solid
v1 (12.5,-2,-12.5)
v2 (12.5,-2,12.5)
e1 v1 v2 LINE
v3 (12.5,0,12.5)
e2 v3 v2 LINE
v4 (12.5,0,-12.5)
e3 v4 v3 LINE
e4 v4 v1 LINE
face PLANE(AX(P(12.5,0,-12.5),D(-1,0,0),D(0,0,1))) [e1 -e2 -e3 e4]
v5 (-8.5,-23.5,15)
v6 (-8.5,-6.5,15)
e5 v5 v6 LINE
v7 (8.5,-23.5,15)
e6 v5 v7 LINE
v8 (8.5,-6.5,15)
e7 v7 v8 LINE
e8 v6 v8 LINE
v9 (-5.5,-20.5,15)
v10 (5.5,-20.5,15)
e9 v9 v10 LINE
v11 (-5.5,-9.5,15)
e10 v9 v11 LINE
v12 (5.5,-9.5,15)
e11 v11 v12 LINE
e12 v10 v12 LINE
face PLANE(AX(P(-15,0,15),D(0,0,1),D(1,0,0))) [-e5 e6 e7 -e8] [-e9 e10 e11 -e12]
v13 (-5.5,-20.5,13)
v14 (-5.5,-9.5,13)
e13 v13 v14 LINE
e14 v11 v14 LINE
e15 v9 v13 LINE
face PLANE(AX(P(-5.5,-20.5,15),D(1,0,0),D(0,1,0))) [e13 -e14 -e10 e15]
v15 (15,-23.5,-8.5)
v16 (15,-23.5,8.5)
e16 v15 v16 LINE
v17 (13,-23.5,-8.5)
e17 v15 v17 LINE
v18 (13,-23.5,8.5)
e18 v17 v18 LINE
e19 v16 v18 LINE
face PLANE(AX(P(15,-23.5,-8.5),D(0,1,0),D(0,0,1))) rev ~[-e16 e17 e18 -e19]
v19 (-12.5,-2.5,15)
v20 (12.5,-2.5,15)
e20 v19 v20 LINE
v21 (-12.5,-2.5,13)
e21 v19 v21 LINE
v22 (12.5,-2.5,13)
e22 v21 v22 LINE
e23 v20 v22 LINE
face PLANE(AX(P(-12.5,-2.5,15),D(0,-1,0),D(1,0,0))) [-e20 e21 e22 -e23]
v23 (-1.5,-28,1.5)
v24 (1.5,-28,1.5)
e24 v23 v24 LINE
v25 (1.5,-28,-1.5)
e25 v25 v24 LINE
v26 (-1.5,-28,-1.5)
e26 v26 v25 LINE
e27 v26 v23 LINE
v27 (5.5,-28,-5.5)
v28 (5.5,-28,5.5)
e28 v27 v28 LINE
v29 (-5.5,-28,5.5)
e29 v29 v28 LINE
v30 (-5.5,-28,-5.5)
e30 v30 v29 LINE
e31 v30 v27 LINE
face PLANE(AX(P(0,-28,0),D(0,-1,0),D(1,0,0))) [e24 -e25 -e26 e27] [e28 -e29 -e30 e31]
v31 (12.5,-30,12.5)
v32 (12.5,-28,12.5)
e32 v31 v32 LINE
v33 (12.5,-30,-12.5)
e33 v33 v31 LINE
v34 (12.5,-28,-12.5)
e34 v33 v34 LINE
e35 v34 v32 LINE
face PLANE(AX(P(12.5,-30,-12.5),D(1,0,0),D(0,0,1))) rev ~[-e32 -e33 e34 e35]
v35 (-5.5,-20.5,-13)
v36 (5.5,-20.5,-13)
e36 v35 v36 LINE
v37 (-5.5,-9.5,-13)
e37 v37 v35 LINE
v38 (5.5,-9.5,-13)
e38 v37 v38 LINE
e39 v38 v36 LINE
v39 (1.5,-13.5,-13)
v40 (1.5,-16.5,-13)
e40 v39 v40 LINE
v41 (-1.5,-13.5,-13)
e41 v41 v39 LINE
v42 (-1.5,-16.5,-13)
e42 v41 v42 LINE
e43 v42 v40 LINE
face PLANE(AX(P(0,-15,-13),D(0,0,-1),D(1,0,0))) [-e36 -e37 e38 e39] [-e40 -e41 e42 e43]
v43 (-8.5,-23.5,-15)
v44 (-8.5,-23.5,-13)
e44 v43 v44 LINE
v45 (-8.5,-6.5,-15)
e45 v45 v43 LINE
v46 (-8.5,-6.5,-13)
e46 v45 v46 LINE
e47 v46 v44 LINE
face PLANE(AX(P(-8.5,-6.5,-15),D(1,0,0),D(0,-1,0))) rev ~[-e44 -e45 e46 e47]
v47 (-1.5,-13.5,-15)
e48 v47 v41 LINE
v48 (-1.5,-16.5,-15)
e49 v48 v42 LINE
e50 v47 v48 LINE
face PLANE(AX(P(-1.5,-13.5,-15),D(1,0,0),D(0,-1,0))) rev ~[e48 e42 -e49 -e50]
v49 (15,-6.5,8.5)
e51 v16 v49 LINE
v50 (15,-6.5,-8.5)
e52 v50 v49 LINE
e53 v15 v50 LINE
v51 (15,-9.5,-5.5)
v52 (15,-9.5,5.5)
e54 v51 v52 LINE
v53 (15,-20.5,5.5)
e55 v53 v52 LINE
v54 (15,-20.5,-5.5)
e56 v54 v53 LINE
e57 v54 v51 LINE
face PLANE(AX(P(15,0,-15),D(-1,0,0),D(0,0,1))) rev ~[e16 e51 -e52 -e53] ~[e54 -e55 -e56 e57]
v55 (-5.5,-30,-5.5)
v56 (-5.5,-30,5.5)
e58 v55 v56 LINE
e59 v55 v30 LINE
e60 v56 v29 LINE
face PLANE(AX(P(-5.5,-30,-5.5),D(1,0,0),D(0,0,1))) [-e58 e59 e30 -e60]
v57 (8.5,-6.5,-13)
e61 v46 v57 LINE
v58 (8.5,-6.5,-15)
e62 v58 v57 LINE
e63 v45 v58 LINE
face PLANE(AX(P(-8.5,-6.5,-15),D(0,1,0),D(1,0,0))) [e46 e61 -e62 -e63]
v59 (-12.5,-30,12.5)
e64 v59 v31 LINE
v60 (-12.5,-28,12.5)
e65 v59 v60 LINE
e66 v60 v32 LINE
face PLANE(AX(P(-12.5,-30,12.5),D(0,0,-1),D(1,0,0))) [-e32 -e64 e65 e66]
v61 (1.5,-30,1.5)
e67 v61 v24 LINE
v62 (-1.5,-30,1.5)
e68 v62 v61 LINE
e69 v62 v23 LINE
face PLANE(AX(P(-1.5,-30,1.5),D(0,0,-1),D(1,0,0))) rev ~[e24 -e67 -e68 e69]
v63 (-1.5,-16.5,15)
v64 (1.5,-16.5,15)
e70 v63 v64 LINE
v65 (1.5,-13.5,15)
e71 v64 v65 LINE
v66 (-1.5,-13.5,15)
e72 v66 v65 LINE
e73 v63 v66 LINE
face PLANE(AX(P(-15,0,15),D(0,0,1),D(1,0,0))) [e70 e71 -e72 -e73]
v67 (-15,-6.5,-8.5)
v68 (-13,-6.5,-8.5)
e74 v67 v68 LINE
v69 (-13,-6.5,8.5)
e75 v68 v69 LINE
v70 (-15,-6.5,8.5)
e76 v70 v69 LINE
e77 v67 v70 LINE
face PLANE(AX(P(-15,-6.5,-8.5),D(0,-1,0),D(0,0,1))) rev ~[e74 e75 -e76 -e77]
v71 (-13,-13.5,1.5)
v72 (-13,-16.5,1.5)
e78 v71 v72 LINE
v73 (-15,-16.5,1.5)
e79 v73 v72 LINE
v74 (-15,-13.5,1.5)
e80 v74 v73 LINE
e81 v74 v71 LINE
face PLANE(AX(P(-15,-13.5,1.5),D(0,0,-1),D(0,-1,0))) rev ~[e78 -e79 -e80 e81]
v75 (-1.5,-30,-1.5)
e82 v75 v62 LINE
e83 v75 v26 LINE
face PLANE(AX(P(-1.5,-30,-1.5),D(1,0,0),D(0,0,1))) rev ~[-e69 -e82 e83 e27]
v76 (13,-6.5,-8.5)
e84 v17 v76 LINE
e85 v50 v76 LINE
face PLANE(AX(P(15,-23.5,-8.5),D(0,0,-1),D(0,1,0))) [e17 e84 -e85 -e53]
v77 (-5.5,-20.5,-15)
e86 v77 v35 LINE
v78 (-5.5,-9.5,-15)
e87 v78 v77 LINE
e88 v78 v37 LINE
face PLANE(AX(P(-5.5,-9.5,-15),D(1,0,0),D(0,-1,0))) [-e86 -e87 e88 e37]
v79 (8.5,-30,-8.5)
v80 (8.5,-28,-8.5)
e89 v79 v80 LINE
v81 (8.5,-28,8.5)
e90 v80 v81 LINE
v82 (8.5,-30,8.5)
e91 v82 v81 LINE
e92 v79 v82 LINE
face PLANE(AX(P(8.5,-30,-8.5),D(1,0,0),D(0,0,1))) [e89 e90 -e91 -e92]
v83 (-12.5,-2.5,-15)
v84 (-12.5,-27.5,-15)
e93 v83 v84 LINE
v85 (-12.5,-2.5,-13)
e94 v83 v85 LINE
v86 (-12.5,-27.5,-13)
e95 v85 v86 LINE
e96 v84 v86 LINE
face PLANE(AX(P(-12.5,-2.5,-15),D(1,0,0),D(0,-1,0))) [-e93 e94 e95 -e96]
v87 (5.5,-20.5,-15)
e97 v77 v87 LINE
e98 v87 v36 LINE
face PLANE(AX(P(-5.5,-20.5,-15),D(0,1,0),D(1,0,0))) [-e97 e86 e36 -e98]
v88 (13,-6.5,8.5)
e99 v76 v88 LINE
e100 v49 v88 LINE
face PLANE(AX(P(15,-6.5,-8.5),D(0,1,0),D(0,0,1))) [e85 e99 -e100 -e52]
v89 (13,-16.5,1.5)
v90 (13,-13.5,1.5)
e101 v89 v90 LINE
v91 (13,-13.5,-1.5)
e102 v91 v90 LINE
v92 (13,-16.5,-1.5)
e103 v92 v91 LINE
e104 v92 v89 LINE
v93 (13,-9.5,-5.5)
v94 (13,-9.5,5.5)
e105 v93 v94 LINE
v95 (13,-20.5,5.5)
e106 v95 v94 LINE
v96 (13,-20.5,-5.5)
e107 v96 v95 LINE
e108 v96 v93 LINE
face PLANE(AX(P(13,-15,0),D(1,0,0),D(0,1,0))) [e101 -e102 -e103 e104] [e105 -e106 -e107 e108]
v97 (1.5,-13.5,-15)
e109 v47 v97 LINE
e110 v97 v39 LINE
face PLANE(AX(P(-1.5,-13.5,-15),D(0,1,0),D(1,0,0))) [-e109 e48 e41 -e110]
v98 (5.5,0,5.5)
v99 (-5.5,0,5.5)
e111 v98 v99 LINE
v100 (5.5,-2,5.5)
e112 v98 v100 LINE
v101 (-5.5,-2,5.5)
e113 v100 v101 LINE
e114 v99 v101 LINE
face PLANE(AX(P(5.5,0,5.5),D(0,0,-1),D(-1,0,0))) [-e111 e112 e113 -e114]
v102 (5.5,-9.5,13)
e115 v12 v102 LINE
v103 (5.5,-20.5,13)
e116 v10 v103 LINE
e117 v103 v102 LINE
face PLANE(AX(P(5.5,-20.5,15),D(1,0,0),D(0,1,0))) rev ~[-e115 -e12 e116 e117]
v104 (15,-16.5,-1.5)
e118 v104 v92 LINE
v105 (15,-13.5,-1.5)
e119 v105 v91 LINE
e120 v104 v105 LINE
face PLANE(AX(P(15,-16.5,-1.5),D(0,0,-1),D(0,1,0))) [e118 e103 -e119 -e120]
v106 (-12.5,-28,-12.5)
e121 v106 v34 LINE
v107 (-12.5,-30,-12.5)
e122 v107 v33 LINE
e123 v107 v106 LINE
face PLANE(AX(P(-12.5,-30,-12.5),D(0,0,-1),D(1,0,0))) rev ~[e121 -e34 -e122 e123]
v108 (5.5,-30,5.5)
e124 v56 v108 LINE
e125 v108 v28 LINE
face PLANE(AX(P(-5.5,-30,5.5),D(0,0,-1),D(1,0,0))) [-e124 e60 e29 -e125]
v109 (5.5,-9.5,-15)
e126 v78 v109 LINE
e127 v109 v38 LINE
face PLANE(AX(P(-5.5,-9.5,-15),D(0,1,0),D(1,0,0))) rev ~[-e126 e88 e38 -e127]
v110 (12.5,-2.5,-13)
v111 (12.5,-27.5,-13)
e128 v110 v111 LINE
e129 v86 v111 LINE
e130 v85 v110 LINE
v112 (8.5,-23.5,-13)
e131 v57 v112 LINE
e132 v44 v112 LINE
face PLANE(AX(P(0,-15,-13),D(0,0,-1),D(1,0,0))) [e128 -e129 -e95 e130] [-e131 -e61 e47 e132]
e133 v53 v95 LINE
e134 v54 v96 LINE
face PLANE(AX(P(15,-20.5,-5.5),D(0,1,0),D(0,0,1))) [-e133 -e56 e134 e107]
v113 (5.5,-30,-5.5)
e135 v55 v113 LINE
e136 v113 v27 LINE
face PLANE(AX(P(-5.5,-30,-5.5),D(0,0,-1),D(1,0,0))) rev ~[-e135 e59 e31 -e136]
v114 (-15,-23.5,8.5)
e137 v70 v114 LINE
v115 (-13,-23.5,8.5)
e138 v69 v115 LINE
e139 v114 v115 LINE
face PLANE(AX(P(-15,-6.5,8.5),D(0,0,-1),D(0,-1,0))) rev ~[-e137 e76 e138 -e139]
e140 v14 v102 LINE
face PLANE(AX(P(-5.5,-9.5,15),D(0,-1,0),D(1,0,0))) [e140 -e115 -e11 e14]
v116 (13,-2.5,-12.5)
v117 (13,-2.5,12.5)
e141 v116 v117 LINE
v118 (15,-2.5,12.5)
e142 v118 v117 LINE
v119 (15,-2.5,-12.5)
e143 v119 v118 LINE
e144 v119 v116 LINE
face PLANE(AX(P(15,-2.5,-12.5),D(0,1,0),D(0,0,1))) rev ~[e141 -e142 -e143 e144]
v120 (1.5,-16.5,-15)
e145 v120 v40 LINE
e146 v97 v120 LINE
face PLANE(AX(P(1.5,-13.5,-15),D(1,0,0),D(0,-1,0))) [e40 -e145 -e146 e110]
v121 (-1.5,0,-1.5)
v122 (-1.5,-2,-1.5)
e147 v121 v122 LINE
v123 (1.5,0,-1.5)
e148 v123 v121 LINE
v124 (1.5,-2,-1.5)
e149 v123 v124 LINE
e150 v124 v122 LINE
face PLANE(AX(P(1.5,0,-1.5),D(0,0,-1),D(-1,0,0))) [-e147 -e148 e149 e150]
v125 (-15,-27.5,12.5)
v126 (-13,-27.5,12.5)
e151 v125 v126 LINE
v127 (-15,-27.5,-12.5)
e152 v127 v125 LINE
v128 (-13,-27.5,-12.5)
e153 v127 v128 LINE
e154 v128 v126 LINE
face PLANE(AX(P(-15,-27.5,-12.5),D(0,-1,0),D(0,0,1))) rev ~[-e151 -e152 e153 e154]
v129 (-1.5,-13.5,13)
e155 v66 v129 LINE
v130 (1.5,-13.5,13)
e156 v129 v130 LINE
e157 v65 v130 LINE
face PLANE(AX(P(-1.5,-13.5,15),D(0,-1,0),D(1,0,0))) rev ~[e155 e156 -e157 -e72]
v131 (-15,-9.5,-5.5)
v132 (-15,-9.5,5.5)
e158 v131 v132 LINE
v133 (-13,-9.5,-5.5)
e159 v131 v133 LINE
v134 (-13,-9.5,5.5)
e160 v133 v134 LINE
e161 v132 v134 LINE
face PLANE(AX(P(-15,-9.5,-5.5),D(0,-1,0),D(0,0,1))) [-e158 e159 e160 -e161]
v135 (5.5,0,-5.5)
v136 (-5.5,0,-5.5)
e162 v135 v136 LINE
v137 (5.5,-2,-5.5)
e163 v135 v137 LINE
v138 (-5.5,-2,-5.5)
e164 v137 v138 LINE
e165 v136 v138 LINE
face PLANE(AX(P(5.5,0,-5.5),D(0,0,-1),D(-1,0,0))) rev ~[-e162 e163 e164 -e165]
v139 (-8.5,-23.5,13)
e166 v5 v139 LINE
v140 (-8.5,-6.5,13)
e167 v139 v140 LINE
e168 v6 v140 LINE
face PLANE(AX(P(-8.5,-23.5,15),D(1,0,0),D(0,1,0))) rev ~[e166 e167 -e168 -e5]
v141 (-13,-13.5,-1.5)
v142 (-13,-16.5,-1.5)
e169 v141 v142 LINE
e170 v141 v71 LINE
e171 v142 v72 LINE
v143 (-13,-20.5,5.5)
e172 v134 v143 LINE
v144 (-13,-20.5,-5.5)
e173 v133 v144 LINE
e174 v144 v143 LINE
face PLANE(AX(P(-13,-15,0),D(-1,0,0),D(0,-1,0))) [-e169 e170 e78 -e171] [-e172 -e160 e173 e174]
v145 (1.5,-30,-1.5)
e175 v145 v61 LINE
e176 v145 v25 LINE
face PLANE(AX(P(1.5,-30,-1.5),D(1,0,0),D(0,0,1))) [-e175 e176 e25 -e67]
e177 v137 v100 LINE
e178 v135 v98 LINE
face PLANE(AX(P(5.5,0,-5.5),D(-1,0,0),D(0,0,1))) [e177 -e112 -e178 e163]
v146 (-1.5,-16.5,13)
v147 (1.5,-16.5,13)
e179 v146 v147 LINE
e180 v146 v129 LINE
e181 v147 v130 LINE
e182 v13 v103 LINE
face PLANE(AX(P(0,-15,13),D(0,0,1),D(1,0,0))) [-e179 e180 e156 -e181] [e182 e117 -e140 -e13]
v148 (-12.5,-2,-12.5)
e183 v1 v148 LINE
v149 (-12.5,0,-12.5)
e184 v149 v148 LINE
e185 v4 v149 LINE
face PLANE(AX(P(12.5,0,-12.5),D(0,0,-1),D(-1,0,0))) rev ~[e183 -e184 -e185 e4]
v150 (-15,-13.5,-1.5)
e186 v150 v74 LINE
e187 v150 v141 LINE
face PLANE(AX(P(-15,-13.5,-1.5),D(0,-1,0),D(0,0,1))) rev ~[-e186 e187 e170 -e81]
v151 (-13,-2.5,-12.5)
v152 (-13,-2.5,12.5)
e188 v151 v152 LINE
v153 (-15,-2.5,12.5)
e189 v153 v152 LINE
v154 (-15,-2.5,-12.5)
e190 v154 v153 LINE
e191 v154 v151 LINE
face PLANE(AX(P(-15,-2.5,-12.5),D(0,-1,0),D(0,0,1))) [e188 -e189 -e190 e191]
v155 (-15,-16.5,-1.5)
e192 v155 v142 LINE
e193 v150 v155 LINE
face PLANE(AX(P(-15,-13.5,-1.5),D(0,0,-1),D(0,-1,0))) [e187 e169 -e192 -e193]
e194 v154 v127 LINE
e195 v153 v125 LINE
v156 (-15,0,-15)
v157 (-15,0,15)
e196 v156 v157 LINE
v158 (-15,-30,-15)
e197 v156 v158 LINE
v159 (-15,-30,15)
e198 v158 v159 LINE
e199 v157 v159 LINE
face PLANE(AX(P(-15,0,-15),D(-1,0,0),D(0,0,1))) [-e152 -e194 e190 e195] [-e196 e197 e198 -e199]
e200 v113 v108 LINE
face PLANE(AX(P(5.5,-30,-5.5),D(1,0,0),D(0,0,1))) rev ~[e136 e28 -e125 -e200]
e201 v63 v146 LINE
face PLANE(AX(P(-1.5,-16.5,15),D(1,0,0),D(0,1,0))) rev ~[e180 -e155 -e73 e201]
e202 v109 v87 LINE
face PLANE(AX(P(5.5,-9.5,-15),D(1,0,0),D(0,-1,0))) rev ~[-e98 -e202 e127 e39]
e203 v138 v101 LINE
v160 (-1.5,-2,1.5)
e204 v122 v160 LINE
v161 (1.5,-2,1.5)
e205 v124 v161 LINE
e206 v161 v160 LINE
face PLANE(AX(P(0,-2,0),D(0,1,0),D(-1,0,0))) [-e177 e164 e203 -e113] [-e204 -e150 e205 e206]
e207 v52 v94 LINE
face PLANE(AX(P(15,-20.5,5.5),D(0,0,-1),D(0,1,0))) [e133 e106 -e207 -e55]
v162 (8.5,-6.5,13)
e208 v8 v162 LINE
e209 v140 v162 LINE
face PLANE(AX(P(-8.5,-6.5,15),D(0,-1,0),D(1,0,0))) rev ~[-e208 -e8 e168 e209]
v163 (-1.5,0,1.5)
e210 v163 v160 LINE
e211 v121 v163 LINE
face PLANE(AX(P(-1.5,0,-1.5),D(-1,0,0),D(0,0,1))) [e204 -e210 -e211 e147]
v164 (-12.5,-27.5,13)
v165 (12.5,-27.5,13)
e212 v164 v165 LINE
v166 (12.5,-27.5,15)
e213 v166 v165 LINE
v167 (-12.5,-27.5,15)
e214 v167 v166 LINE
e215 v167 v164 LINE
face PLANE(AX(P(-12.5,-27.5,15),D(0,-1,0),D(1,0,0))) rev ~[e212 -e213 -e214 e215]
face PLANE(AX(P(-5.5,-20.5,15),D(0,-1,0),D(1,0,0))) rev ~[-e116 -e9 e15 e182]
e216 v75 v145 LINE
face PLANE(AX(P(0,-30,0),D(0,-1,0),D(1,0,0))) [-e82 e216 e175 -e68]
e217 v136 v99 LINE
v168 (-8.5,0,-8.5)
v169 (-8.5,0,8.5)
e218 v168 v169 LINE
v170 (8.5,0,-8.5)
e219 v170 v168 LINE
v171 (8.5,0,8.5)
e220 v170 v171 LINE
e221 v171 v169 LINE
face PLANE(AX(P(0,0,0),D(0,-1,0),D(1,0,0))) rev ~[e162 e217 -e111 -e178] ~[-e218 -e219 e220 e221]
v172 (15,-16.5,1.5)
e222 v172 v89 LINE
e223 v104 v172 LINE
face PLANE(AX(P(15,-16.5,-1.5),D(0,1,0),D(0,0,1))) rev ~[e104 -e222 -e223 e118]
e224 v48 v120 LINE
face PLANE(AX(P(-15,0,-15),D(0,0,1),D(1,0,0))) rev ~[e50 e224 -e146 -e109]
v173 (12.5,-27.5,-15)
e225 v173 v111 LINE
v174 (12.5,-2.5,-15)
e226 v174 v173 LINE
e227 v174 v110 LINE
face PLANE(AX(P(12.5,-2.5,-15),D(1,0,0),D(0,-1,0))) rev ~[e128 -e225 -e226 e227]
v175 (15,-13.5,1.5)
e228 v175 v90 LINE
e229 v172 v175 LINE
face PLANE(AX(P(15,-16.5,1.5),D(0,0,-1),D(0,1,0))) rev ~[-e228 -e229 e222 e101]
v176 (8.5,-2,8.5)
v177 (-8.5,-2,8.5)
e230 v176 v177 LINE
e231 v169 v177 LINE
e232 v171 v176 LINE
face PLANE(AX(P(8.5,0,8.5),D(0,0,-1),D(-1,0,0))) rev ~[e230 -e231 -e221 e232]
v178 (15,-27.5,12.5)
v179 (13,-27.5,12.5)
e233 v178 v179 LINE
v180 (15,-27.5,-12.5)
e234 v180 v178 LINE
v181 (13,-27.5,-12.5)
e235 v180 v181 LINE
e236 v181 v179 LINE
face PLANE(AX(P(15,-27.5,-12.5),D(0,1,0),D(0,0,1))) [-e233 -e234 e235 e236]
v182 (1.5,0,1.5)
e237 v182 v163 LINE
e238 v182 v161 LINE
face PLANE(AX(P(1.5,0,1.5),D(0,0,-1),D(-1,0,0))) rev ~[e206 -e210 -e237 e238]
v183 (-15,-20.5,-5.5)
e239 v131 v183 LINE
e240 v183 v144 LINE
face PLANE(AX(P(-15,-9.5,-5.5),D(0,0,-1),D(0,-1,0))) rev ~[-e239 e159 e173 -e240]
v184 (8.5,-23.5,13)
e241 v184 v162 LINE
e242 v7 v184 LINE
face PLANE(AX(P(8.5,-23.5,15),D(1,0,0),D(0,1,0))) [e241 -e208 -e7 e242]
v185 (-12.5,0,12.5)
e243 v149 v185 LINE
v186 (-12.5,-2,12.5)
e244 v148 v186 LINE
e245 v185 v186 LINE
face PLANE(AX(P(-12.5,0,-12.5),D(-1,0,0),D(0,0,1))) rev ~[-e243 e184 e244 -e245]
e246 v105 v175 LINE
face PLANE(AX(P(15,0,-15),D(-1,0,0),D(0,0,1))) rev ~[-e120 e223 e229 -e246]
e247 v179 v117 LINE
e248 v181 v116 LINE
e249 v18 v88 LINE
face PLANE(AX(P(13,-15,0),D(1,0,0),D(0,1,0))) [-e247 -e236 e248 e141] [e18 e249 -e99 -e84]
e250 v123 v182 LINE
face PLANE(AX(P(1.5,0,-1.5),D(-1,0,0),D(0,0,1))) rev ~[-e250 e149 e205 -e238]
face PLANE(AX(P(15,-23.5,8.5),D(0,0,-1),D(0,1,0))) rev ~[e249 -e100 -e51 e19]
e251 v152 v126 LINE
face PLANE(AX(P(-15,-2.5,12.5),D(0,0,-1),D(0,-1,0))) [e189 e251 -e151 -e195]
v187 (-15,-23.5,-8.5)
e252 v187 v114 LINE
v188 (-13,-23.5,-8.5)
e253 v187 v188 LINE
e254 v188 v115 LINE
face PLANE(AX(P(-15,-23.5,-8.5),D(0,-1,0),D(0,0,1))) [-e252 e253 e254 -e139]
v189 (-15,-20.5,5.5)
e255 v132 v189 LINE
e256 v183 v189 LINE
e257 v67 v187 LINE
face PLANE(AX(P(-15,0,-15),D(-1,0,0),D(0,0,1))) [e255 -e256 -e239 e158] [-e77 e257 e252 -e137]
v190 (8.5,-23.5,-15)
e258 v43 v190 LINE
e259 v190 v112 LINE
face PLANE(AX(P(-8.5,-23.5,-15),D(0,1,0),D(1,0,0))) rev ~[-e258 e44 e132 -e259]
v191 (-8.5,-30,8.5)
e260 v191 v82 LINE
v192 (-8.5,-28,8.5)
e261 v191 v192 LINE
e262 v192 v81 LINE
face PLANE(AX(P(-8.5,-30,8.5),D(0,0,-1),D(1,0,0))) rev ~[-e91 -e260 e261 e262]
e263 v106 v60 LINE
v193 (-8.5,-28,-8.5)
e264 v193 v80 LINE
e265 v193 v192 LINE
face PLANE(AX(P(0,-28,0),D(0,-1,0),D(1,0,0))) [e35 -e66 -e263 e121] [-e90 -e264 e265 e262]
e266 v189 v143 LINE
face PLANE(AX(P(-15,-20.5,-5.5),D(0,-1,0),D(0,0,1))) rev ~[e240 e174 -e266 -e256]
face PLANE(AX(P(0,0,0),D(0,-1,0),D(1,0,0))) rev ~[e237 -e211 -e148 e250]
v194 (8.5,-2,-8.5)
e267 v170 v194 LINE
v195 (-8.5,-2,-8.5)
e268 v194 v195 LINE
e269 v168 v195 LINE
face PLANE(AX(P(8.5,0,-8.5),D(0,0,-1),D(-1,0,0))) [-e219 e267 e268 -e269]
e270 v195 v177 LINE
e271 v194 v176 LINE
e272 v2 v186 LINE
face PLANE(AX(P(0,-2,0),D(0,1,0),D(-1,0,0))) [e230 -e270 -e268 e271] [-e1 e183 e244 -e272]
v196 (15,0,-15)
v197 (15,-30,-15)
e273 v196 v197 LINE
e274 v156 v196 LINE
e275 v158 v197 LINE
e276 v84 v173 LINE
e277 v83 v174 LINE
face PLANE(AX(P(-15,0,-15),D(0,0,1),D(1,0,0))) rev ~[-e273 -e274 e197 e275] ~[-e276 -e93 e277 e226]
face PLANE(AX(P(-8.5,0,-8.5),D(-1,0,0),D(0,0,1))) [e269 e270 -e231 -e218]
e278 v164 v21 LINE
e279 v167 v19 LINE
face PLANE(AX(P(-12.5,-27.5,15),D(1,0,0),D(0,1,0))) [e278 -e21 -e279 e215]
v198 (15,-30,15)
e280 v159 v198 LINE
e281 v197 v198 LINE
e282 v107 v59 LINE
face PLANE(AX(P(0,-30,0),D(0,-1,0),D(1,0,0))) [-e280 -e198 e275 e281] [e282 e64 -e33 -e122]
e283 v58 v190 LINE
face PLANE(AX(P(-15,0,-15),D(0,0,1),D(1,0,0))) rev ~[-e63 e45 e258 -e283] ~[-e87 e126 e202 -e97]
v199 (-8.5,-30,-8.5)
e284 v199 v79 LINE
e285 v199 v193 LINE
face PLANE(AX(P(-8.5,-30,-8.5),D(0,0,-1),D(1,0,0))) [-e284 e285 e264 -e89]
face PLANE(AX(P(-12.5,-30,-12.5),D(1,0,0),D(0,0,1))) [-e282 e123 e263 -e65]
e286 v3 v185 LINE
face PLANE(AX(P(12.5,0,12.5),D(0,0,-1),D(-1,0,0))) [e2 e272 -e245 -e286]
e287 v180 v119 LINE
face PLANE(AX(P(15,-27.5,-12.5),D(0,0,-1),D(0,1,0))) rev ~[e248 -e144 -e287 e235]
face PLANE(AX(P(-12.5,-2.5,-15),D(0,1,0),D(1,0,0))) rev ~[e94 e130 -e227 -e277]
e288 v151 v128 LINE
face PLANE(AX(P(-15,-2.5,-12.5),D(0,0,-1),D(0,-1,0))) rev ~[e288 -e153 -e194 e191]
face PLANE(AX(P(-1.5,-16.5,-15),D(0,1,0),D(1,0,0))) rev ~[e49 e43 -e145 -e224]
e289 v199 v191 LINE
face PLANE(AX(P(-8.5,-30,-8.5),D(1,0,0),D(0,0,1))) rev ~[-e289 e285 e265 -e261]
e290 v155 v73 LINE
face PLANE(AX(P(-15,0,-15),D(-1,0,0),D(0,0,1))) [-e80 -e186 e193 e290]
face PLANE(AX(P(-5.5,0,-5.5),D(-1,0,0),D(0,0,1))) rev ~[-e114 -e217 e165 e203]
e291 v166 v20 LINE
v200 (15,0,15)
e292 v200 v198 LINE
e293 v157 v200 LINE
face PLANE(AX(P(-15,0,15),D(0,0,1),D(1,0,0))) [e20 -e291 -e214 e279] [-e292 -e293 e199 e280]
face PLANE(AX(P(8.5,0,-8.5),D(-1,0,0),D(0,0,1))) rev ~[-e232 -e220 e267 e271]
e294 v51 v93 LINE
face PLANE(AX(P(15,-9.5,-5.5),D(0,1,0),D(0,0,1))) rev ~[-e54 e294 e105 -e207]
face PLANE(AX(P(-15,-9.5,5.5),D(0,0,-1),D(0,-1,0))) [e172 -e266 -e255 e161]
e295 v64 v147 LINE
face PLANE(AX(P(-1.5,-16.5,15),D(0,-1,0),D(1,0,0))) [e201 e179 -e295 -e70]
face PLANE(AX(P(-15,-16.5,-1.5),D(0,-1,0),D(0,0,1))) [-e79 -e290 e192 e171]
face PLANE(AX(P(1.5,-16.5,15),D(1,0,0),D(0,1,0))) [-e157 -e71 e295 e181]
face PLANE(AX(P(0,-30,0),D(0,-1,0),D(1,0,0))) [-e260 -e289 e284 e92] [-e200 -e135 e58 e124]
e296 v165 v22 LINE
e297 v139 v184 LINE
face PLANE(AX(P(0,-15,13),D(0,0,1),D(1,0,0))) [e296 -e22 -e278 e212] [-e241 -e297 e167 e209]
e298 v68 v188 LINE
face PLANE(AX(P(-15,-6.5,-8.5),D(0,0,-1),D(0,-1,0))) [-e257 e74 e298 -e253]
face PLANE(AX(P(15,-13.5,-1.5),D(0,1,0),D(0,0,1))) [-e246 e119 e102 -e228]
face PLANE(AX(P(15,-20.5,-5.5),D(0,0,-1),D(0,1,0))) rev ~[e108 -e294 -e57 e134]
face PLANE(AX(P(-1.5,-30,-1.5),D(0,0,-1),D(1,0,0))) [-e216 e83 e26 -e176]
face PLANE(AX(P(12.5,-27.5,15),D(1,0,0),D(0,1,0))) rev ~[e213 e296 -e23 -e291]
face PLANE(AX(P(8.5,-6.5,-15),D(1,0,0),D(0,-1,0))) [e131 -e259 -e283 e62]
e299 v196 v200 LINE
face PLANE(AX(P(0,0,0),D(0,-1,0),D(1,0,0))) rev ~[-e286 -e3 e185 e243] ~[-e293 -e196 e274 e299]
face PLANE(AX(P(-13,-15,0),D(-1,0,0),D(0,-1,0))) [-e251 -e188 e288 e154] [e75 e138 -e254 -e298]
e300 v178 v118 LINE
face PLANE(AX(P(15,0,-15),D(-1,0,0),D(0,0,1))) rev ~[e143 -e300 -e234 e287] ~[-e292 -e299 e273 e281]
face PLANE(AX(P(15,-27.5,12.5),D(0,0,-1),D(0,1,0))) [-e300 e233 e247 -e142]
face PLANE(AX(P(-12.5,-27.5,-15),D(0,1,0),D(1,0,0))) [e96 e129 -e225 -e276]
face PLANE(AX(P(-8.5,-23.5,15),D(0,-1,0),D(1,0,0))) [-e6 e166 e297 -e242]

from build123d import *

# Parameters (mm, degrees)
F0_W      = 30
F0_H      = 30
F1_DEPTH  = 30
F2_W      = 25
F2_H      = 25
F2_W_2    = 17
F2_H_2    = 17
F2_W_3    = 11
F2_H_3    = 11
F2_W_4    = 3
F2_H_4    = 3
F3_DEPTH  = 2
F4_W      = 25
F4_H      = 25
F4_W_2    = 17
F4_H_2    = 17
F4_W_3    = 11
F4_H_3    = 11
F4_W_4    = 3
F4_H_4    = 3
F5_DEPTH  = 2
F6_W      = 25
F6_H      = 25
F6_W_2    = 17
F6_H_2    = 17
F6_W_3    = 11
F6_H_3    = 11
F6_W_4    = 3
F6_H_4    = 3
F7_DEPTH  = 2
F8_W      = 25
F8_H      = 25
F8_W_2    = 17
F8_H_2    = 17
F8_W_3    = 11
F8_H_3    = 11
F8_W_4    = 3
F8_H_4    = 3
F9_DEPTH  = 2
F10_W     = 25
F10_H     = 25
F10_W_2   = 17
F10_H_2   = 17
F10_W_3   = 11
F10_H_3   = 11
F10_W_4   = 3
F10_H_4   = 3
F11_DEPTH = 2
F12_W     = 25
F12_H     = 25
F12_W_2   = 17
F12_H_2   = 17
F12_W_3   = 11
F12_H_3   = 11
F12_W_4   = 3
F12_H_4   = 3
F13_DEPTH = 2


# Not quite as in the source:
# - a feature names something its author has since deleted; it is built from what else it names


with BuildPart() as f1:
    # F0 (on Front) → F1 (new body)
    with BuildSketch(Plane.XZ):
        Rectangle(F0_W, F0_H)
    extrude(amount=F1_DEPTH)

    # F2 (on face) → F3 (cut)
    with BuildSketch(Plane.XY.offset(15)):
        with Locations((0, -15)):
            Rectangle(F2_W, F2_H)
        with Locations((0, -15)):
            Rectangle(F2_W_2, F2_H_2, mode=Mode.SUBTRACT)
        with Locations((0, -15)):
            Rectangle(F2_W_3, F2_H_3)
        with Locations((0, -15)):
            Rectangle(F2_W_4, F2_H_4, mode=Mode.SUBTRACT)
    extrude(amount=-F3_DEPTH, mode=Mode.SUBTRACT)

    # F4 (on face) → F5 (cut)
    with BuildSketch(Plane(origin=(-15, 0, 0), x_dir=(0, -1, 0), z_dir=(-1, 0, 0))):
        with Locations((15, 0)):
            Rectangle(F4_W, F4_H)
        with Locations((15, 0)):
            Rectangle(F4_W_2, F4_H_2, mode=Mode.SUBTRACT)
        with Locations((15, 0)):
            Rectangle(F4_W_3, F4_H_3)
        with Locations((15, 0)):
            Rectangle(F4_W_4, F4_H_4, mode=Mode.SUBTRACT)
    extrude(amount=-F5_DEPTH, mode=Mode.SUBTRACT)

    # F6 (on face) → F7 (cut)
    with BuildSketch(Plane(origin=(0, 0, -15), x_dir=(1, 0, 0), z_dir=(0, 0, -1))):
        with Locations((0, 15)):
            Rectangle(F6_W, F6_H)
        with Locations((0, 15)):
            Rectangle(F6_W_2, F6_H_2, mode=Mode.SUBTRACT)
        with Locations((0, 15)):
            Rectangle(F6_W_3, F6_H_3)
        with Locations((0, 15)):
            Rectangle(F6_W_4, F6_H_4, mode=Mode.SUBTRACT)
    extrude(amount=-F7_DEPTH, mode=Mode.SUBTRACT)

    # F8 (on face) → F9 (cut)
    with BuildSketch(Plane.XZ.offset(30)):
        Rectangle(F8_W, F8_H)
        Rectangle(F8_W_2, F8_H_2, mode=Mode.SUBTRACT)
        Rectangle(F8_W_3, F8_H_3)
        Rectangle(F8_W_4, F8_H_4, mode=Mode.SUBTRACT)
    extrude(amount=-F9_DEPTH, mode=Mode.SUBTRACT)

    # F10 (on face) → F11 (cut)
    with BuildSketch(Plane(origin=(0, 0, 0), x_dir=(-1, 0, 0), z_dir=(0, 1, 0))):
        Rectangle(F10_W, F10_H)
        Rectangle(F10_W_2, F10_H_2, mode=Mode.SUBTRACT)
        Rectangle(F10_W_3, F10_H_3)
        Rectangle(F10_W_4, F10_H_4, mode=Mode.SUBTRACT)
    extrude(amount=-F11_DEPTH, mode=Mode.SUBTRACT)

    # F12 (on face) → F13 (cut)
    with BuildSketch(Plane.YZ.offset(15)):
        with Locations((-15, 0)):
            Rectangle(F12_W, F12_H)
        with Locations((-15, 0)):
            Rectangle(F12_W_2, F12_H_2, mode=Mode.SUBTRACT)
        with Locations((-15, 0)):
            Rectangle(F12_W_3, F12_H_3)
        with Locations((-15, 0)):
            Rectangle(F12_W_4, F12_H_4, mode=Mode.SUBTRACT)
    extrude(amount=-F13_DEPTH, mode=Mode.SUBTRACT)


solid = f1.part
